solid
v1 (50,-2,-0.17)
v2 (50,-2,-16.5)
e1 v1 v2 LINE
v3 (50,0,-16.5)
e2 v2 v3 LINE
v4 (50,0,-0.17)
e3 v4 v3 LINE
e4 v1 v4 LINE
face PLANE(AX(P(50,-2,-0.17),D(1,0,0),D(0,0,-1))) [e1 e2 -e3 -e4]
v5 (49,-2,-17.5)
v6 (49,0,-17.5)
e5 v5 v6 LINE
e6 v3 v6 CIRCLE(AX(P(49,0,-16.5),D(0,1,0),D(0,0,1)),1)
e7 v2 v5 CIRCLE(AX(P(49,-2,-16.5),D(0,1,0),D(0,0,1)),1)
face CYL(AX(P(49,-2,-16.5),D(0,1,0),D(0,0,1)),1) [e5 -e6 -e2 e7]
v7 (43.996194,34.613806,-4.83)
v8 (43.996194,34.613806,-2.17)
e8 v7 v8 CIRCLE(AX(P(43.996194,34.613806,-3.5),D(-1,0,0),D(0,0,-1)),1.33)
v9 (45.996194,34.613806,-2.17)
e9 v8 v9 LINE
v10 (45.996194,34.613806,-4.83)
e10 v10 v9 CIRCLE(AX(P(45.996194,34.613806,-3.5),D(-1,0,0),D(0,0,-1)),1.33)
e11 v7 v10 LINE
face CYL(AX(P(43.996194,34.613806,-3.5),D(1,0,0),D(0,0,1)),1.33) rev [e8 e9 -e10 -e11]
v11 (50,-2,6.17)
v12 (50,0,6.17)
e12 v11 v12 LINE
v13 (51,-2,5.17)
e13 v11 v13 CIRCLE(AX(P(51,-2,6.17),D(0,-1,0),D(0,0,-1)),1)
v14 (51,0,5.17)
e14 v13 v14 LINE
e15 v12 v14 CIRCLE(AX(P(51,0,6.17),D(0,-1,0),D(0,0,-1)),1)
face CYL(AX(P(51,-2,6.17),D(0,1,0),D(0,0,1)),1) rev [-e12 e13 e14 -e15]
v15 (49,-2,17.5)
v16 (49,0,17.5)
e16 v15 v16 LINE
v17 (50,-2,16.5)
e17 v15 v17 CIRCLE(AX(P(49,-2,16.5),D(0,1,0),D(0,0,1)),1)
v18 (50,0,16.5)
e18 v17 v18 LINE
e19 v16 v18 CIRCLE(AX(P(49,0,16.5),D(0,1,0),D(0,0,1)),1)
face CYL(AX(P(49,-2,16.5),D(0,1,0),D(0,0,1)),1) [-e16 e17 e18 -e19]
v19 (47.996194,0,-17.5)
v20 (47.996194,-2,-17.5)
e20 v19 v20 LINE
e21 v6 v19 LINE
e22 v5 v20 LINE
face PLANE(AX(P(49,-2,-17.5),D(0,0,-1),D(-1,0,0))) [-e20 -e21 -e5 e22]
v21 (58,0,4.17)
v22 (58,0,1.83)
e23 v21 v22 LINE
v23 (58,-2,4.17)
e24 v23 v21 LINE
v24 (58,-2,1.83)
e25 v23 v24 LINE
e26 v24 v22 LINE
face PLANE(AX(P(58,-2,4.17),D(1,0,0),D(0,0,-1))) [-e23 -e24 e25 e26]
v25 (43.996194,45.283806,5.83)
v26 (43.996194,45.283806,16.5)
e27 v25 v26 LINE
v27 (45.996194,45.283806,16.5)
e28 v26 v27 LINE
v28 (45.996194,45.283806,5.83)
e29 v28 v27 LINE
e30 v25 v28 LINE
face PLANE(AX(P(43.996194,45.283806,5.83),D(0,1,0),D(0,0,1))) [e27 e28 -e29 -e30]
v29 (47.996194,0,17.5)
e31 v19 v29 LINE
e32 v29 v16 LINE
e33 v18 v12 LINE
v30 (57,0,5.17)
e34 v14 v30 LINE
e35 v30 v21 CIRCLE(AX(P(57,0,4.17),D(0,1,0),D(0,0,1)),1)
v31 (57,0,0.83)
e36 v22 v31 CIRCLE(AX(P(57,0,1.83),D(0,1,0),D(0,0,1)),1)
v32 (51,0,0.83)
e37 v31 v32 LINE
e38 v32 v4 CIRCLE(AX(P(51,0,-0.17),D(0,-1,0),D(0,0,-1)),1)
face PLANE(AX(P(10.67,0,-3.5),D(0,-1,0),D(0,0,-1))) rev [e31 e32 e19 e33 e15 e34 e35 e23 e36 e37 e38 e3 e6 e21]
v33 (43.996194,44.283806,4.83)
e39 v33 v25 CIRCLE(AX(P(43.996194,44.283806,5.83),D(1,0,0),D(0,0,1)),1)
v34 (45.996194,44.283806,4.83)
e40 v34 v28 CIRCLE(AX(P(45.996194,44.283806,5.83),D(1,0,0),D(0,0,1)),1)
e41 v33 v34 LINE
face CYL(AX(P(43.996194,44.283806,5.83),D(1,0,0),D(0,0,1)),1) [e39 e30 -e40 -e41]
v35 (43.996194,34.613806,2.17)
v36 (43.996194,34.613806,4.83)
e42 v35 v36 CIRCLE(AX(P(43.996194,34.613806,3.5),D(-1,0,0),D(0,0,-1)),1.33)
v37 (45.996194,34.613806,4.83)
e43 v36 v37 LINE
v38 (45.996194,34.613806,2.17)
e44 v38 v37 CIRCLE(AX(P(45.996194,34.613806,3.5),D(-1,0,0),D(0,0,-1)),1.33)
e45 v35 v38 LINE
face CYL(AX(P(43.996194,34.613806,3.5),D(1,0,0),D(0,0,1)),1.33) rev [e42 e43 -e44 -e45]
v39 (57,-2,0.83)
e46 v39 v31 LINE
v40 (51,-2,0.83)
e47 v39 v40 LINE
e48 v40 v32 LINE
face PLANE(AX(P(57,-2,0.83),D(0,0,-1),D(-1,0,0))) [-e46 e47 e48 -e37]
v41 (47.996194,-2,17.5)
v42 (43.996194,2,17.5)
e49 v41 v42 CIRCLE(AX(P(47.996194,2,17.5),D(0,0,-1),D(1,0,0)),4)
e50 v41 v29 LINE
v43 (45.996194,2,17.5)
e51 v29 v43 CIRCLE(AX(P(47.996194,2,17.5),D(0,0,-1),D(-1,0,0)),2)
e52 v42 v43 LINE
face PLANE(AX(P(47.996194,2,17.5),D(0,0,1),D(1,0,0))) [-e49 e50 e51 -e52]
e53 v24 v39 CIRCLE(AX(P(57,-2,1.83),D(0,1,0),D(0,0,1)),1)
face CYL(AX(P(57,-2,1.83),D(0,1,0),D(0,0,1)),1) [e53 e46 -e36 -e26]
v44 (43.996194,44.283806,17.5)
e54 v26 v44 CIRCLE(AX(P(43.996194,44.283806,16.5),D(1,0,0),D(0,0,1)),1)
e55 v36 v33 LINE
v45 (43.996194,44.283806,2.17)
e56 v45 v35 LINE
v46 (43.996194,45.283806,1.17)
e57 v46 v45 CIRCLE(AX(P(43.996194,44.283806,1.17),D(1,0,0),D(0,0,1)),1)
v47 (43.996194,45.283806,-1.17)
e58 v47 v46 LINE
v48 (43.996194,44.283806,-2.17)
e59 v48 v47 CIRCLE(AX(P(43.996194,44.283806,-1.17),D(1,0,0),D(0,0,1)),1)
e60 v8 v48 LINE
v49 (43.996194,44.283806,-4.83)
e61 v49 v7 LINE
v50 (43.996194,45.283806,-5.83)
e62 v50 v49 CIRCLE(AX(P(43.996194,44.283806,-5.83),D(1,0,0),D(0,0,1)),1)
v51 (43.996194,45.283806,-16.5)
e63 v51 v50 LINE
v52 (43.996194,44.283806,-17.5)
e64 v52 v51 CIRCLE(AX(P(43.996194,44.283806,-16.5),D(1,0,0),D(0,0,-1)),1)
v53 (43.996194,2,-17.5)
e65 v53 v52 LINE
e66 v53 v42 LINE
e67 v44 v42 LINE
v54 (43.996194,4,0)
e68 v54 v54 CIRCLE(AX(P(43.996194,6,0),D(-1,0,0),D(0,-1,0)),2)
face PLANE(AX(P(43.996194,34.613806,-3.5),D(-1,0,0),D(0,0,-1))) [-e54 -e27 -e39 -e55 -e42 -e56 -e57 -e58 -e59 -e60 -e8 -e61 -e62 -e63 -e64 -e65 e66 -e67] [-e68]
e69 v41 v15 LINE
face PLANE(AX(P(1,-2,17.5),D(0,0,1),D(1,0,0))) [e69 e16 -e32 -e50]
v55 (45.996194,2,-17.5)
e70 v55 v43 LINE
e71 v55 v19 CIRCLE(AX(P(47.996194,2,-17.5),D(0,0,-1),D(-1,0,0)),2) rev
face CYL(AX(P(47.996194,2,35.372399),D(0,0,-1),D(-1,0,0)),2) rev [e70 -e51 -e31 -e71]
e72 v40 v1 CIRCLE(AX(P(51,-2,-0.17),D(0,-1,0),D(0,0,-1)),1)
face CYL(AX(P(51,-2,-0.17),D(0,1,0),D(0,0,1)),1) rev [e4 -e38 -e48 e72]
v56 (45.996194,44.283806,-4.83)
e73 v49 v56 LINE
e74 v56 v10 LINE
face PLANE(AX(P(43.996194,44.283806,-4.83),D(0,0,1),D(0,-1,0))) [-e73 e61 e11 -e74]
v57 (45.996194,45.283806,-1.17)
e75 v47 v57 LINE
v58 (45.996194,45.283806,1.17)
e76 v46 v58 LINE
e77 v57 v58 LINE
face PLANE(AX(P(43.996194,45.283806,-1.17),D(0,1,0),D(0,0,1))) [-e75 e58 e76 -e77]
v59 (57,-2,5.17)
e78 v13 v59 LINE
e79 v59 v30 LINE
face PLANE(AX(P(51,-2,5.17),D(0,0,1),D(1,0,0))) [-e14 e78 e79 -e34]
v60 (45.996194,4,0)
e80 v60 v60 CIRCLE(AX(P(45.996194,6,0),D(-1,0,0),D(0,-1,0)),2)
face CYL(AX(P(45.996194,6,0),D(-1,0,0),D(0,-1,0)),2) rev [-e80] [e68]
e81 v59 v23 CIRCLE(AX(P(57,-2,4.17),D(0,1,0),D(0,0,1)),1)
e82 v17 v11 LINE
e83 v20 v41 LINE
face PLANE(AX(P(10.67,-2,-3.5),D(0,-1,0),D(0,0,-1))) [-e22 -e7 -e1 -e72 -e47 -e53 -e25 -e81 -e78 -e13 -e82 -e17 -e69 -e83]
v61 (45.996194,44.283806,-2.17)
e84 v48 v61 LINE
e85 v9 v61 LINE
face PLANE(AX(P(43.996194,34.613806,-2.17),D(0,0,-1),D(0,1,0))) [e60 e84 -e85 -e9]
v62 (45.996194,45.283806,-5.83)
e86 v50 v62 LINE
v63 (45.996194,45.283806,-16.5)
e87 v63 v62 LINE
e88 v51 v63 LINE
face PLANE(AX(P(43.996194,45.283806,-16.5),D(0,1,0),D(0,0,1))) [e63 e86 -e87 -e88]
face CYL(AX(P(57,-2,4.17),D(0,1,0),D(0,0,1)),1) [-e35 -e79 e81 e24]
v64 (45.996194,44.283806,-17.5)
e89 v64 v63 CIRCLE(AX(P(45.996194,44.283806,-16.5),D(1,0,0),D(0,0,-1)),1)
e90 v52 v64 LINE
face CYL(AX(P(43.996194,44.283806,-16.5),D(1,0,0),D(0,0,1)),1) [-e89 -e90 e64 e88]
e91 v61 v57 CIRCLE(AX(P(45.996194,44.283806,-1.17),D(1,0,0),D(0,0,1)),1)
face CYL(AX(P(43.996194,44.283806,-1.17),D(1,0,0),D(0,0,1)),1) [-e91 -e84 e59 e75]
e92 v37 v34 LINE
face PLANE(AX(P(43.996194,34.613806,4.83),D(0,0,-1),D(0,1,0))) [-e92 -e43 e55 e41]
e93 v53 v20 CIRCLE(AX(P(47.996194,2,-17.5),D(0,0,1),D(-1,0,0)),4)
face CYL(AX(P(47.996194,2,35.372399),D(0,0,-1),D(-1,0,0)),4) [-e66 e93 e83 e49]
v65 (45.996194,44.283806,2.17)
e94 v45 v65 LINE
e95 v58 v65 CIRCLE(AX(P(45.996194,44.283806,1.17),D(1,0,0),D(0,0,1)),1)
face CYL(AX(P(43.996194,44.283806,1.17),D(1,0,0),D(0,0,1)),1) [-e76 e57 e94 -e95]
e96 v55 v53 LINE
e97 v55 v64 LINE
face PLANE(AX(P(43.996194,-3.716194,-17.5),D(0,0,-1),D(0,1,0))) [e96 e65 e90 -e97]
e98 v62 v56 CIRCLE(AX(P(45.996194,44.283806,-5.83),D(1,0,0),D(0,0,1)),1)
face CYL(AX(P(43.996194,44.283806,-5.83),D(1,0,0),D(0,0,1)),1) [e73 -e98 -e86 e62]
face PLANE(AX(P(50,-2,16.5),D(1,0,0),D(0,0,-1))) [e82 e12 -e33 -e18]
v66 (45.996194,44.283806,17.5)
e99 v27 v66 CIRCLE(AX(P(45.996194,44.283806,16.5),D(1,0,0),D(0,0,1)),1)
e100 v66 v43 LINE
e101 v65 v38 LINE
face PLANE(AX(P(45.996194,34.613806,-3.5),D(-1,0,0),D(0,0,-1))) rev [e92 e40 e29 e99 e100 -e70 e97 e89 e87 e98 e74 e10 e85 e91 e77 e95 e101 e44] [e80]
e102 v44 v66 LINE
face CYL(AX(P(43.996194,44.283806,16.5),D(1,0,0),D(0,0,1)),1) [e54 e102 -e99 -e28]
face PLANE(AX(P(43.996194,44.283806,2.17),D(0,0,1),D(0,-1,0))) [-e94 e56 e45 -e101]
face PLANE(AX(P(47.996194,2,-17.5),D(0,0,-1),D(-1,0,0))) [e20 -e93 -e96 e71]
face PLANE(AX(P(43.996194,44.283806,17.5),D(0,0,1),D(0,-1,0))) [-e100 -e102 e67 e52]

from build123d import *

# Parameters (mm, degrees)
BASE_FLANGE1_DEPTH       = 2
SKETCHED_BEND1_OUTLINE_W = 2
SKETCHED_BEND1_OUTLINE_H = 35
SKETCHED_BEND1_DEPTH     = 44.40715449
SKETCHED_START           = 45.98523449
SKETCHED_BEND1_2_DEPTH   = 0.01096
SKETCHED_START_2         = 43.99619449
SKETCHED_BEND1_3_DEPTH   = 4
SKETCHED_START_3         = -17.5
SKETCHED_BEND1_4_DEPTH   = 35
SKETCH7_R                = 2
CUT_EXTRUDE1_DEPTH       = 10


with BuildPart() as part:
    # Base-Flange1: sheet metal written as solids
    # Sketch1 → Base-Flange1 (new body)
    with BuildSketch(Plane(origin=(0, 0, 0), x_dir=(1, 0, 0), z_dir=(0, 1, 0))):
        with BuildLine():
            Line((0, 16.5), (0, 5.83))
            ThreePointArc((0, 5.83), (0.292893219, 5.122893219), (1, 4.83))
            Line((1, 4.83), (10.67, 4.83))
            ThreePointArc((10.67, 4.83), (12, 3.5), (10.67, 2.17))
            Line((10.67, 2.17), (1, 2.17))
            ThreePointArc((1, 2.17), (0.292893219, 1.877106781), (0, 1.17))
            Line((0, 1.17), (0, -1.17))
            ThreePointArc((0, -1.17), (0.292893219, -1.877106781), (1, -2.17))
            Line((1, -2.17), (10.67, -2.17))
            ThreePointArc((10.67, -2.17), (12, -3.5), (10.67, -4.83))
            Line((10.67, -4.83), (1, -4.83))
            ThreePointArc((1, -4.83), (0.292893219, -5.122893219), (0, -5.83))
            Line((0, -5.83), (0, -16.5))
            ThreePointArc((0, -16.5), (0.292893219, -17.207106781), (1, -17.5))
            Line((1, -17.5), (49, -17.5))
            ThreePointArc((49, -17.5), (49.707106781, -17.207106781), (50, -16.5))
            Line((50, -16.5), (50, -6.17))
            ThreePointArc((50, -6.17), (50.292893219, -5.462893219), (51, -5.17))
            Line((51, -5.17), (57, -5.17))
            ThreePointArc((57, -5.17), (57.707106781, -4.877106781), (58, -4.17))
            Line((58, -4.17), (58, -1.83))
            ThreePointArc((58, -1.83), (57.707106781, -1.122893219), (57, -0.83))
            Line((57, -0.83), (51, -0.83))
            ThreePointArc((51, -0.83), (50.292893219, -0.537106781), (50, 0.17))
            Line((50, 0.17), (50, 16.5))
            ThreePointArc((50, 16.5), (49.707106781, 17.207106781), (49, 17.5))
            Line((49, 17.5), (1, 17.5))
            ThreePointArc((1, 17.5), (0.292893219, 17.207106781), (0, 16.5))
        make_face()
    extrude(amount=-BASE_FLANGE1_DEPTH)

    # Sketched Bend1: read off the stored shape, not the designer's step
    # Sketched Bend1 outline → Sketched Bend1 (cut)
    with BuildSketch(Plane.YZ):
        with Locations((-1, 0)):
            Rectangle(SKETCHED_BEND1_OUTLINE_W, SKETCHED_BEND1_OUTLINE_H)
    extrude(amount=SKETCHED_BEND1_DEPTH, mode=Mode.SUBTRACT)

    # Sketched Bend1 2 outline → Sketched Bend1 2 (add)
    with BuildSketch(Plane.YZ.offset(SKETCHED_START)):
        with BuildLine():
            Line((0, -17.5), (44.28380551, -17.5))
            ThreePointArc((44.28380551, -17.5), (44.990912291, -17.207106781), (45.28380551, -16.5))
            Line((45.28380551, -16.5), (45.28380551, -5.83))
            ThreePointArc((45.28380551, -5.83), (44.990912291, -5.122893219), (44.28380551, -4.83))
            Line((44.28380551, -4.83), (34.61380551, -4.83))
            ThreePointArc((34.61380551, -4.83), (33.28380551, -3.5), (34.61380551, -2.17))
            Line((34.61380551, -2.17), (44.28380551, -2.17))
            ThreePointArc((44.28380551, -2.17), (44.990912291, -1.877106781), (45.28380551, -1.17))
            Line((45.28380551, -1.17), (45.28380551, 1.17))
            ThreePointArc((45.28380551, 1.17), (44.990912291, 1.877106781), (44.28380551, 2.17))
            Line((44.28380551, 2.17), (34.61380551, 2.17))
            ThreePointArc((34.61380551, 2.17), (33.28380551, 3.5), (34.61380551, 4.83))
            Line((34.61380551, 4.83), (44.28380551, 4.83))
            ThreePointArc((44.28380551, 4.83), (44.990912291, 5.122893219), (45.28380551, 5.83))
            Line((45.28380551, 5.83), (45.28380551, 16.5))
            ThreePointArc((45.28380551, 16.5), (44.990912291, 17.207106781), (44.28380551, 17.5))
            Line((44.28380551, 17.5), (0, 17.5))
            Line((0, 17.5), (0, -17.5))
        make_face()
    extrude(amount=SKETCHED_BEND1_2_DEPTH)

    # Sketched Bend1 3 outline → Sketched Bend1 3 (add)
    with BuildSketch(Plane.YZ.offset(SKETCHED_START_2)):
        with BuildLine():
            Line((0, -17.5), (44.28380551, -17.5))
            ThreePointArc((44.28380551, -17.5), (44.990912291, -17.207106781), (45.28380551, -16.5))
            Line((45.28380551, -16.5), (45.28380551, -5.83))
            ThreePointArc((45.28380551, -5.83), (44.990912291, -5.122893219), (44.28380551, -4.83))
            Line((44.28380551, -4.83), (34.61380551, -4.83))
            ThreePointArc((34.61380551, -4.83), (33.28380551, -3.5), (34.61380551, -2.17))
            Line((34.61380551, -2.17), (44.28380551, -2.17))
            ThreePointArc((44.28380551, -2.17), (44.990912291, -1.877106781), (45.28380551, -1.17))
            Line((45.28380551, -1.17), (45.28380551, 1.17))
            ThreePointArc((45.28380551, 1.17), (44.990912291, 1.877106781), (44.28380551, 2.17))
            Line((44.28380551, 2.17), (34.61380551, 2.17))
            ThreePointArc((34.61380551, 2.17), (33.28380551, 3.5), (34.61380551, 4.83))
            Line((34.61380551, 4.83), (44.28380551, 4.83))
            ThreePointArc((44.28380551, 4.83), (44.990912291, 5.122893219), (45.28380551, 5.83))
            Line((45.28380551, 5.83), (45.28380551, 16.5))
            ThreePointArc((45.28380551, 16.5), (44.990912291, 17.207106781), (44.28380551, 17.5))
            Line((44.28380551, 17.5), (0, 17.5))
            Line((0, 17.5), (0, -17.5))
        make_face()
    extrude(amount=SKETCHED_BEND1_3_DEPTH)

    # Sketched Bend1 4 outline → Sketched Bend1 4 (cut)
    with BuildSketch(Plane.XY.offset(SKETCHED_START_3)):
        with BuildLine():
            Line((47.99619449, 45.28380551), (45.99619449, 45.28380551))
            Line((45.99619449, 45.28380551), (45.99619449, 2))
            ThreePointArc((45.99619449, 2), (46.581980928, 0.585786438), (47.99619449, 0))
            Line((47.99619449, 0), (47.99619449, 45.28380551))
        make_face()
        with BuildLine():
            ThreePointArc((47.99619449, -2), (45.167767365, -0.828427125), (43.99619449, 2))
            Line((43.99619449, 2), (43.99619449, 0))
            Line((43.99619449, 0), (44.40715449, 0))
            Line((44.40715449, 0), (44.40715449, -2))
            Line((44.40715449, -2), (47.99619449, -2))
        make_face()
    extrude(amount=SKETCHED_BEND1_4_DEPTH, mode=Mode.SUBTRACT)

    # Sketch7 → Cut-Extrude1 (cut)
    with BuildSketch(Plane.ZY.offset(-43.99619449)):
        with Locations(Location((0, 6, 0), (0, 0, 270))):
            Circle(SKETCH7_R)
    extrude(amount=-CUT_EXTRUDE1_DEPTH, mode=Mode.SUBTRACT)


solid = part.part
